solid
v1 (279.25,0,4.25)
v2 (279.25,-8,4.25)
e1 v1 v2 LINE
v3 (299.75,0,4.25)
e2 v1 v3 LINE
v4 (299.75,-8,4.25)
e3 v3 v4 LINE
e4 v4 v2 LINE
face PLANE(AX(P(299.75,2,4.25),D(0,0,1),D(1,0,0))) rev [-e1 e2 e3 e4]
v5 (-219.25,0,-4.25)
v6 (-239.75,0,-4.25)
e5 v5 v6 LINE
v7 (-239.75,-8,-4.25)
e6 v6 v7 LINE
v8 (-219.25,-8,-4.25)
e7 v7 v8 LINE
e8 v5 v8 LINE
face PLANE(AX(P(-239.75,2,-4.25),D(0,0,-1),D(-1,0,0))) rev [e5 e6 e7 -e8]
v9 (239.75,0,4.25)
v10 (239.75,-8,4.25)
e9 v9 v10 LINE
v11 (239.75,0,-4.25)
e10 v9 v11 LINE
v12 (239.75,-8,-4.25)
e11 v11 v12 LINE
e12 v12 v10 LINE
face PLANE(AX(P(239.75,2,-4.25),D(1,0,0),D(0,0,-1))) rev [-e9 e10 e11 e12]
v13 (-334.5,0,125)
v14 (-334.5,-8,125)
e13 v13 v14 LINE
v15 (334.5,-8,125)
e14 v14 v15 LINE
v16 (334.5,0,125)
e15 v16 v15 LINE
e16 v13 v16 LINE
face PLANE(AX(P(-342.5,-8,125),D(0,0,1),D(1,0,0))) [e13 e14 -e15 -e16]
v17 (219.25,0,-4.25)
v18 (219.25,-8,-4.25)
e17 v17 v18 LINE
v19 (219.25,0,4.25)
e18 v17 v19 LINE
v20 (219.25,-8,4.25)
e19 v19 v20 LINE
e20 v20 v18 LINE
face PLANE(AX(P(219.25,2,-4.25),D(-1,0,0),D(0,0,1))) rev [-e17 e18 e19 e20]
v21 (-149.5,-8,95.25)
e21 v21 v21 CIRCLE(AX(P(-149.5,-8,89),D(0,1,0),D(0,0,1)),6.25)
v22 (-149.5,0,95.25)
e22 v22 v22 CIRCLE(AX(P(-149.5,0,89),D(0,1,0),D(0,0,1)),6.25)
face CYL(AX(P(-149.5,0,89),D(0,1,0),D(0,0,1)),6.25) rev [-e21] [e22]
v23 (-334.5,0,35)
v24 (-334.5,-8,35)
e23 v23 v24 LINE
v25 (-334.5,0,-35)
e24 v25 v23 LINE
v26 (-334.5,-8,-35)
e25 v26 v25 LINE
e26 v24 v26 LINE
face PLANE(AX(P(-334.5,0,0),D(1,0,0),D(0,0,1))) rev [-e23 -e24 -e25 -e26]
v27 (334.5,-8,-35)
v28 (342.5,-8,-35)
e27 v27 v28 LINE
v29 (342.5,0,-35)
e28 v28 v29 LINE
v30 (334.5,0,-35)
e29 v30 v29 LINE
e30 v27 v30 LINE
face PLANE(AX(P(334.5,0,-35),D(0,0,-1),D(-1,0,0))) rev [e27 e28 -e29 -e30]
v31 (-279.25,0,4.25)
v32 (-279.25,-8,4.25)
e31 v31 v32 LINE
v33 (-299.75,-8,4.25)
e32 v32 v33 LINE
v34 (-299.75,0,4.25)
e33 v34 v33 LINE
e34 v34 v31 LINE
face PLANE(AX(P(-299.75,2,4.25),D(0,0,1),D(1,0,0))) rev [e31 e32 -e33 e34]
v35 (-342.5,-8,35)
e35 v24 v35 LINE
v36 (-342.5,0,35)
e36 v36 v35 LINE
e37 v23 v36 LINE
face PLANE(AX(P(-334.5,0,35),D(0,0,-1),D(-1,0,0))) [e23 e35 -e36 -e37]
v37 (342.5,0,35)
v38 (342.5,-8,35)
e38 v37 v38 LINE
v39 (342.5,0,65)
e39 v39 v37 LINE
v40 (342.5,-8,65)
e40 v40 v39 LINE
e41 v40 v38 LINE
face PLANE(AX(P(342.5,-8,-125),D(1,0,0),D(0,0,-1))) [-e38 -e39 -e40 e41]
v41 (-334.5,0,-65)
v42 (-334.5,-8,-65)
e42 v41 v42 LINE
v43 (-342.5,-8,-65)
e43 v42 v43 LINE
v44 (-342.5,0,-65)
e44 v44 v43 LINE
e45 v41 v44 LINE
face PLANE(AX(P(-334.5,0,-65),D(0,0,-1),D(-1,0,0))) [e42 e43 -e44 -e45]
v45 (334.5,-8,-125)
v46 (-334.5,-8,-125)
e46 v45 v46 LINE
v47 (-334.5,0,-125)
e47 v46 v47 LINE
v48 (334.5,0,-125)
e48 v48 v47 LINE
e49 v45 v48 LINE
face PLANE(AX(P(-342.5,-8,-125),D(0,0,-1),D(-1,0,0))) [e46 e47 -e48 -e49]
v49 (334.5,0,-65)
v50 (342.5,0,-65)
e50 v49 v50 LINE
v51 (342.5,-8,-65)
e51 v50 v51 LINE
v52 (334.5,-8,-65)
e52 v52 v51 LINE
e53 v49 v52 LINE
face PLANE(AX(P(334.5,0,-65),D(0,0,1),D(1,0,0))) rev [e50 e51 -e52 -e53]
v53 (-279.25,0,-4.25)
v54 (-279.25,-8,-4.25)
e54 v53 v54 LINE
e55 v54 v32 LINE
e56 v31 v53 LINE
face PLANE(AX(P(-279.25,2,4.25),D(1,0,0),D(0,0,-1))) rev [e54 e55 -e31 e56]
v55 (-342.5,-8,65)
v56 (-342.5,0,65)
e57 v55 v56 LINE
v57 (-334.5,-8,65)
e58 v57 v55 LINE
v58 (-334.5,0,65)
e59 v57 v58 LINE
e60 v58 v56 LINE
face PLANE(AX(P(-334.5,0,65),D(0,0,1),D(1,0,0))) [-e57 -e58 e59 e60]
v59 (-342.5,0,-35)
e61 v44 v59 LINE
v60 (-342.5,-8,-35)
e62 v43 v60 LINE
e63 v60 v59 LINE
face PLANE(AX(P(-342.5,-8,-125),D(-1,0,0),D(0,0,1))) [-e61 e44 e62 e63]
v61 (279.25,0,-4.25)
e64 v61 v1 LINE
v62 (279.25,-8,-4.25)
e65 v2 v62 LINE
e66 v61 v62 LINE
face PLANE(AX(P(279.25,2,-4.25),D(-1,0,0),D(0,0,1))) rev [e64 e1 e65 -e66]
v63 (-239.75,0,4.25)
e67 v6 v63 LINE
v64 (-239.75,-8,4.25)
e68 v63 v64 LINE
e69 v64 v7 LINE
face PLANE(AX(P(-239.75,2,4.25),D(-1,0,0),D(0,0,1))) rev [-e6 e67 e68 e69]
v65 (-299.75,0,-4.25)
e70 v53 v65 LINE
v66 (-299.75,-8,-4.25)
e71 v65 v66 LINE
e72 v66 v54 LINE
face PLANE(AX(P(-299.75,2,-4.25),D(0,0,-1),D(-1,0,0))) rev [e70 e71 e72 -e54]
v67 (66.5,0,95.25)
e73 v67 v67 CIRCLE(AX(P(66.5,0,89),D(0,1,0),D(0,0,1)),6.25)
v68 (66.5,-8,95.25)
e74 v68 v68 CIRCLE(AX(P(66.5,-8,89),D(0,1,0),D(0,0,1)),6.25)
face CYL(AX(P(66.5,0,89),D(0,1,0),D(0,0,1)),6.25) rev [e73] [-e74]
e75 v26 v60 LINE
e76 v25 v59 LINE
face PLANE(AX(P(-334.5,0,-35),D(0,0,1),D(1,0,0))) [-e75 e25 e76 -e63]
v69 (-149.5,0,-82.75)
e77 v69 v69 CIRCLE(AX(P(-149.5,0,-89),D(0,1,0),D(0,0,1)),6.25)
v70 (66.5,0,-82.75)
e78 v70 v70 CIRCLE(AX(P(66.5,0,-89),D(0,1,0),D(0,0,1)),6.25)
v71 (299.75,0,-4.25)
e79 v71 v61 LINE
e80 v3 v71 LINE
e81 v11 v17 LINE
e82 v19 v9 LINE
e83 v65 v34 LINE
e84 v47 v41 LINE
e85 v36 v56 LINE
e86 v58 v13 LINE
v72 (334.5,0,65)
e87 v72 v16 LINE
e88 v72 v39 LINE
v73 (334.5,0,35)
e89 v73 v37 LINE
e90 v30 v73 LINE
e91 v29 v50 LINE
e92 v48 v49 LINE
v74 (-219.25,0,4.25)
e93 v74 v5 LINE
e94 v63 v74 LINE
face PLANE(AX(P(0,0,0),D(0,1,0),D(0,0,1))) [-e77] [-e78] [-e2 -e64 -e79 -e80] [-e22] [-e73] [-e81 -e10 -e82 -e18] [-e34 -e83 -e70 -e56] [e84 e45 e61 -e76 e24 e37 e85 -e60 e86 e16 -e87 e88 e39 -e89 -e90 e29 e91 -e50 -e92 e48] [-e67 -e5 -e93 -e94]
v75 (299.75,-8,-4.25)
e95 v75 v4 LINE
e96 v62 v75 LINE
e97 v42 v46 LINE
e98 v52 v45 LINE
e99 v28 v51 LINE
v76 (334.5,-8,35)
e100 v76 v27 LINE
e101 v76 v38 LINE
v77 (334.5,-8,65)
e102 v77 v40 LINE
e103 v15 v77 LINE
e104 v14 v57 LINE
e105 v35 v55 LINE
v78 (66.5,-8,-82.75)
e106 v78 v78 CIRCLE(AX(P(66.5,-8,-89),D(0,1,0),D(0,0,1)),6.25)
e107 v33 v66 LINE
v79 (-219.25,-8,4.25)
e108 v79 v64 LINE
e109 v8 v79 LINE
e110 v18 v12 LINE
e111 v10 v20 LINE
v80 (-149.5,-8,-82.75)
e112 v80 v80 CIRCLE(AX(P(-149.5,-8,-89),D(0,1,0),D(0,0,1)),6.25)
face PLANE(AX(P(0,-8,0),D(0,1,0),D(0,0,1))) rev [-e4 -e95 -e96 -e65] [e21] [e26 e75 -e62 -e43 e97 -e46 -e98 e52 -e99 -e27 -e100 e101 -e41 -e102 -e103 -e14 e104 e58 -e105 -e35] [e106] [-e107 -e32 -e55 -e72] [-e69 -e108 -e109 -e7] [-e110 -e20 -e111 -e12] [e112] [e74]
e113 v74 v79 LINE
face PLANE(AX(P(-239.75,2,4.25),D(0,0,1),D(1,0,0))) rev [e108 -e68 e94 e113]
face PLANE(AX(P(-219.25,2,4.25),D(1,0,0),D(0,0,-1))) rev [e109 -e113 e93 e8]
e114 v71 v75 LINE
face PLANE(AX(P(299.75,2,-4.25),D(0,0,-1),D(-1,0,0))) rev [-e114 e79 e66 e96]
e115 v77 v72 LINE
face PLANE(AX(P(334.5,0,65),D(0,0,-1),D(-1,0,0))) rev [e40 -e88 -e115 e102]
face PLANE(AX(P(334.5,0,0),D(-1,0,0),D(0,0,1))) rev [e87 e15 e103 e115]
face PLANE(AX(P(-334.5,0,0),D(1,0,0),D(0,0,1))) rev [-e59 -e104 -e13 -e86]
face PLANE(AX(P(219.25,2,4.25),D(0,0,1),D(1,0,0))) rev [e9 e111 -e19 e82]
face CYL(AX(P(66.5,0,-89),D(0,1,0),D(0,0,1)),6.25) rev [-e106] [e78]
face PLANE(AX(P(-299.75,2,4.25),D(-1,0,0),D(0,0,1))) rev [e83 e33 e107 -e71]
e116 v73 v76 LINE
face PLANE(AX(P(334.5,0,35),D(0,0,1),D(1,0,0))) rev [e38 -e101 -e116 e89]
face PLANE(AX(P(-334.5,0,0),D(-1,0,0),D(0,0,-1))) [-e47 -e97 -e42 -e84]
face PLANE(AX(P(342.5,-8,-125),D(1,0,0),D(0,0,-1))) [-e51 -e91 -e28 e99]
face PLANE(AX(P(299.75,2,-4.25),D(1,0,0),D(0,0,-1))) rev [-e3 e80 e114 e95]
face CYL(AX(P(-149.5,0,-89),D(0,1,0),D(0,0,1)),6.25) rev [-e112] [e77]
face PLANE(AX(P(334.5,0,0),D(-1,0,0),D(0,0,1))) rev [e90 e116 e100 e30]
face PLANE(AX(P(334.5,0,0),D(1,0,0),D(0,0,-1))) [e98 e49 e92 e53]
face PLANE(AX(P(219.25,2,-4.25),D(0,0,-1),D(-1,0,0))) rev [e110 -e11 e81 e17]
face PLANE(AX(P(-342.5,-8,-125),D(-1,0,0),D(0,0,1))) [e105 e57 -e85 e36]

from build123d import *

# Parameters (mm, degrees)
SKETCH1_W                        = 685
SKETCH1_H                        = 250
BASE_FLANGE1_DEPTH               = 8
SKETCH6_W                        = 60
SKETCH6_H                        = 8
SKETCH6_W_2                      = 70
EXTRUDE1_DEPTH                   = 8
SKETCH7_W                        = 250
SKETCH7_H                        = 73.5
BASE_FLANGE2_DEPTH               = 8
SKETCH12_W                       = 30.5
SKETCH12_H                       = 8.5
EXTRUDE2_DEPTH                   = 699.681794525
SKETCH14_W                       = 250
SKETCH14_H                       = 8
BASE_FLANGE3_DEPTH               = 50.5
SKETCH19_W                       = 60
SKETCH19_H                       = 8
SKETCH19_W_2                     = 70
EXTRUDE3_DEPTH                   = 8
BREAK_CORNER1_START              = 41.5
BREAK_CORNER1_DEPTH              = 8
EXTRUDE4_DEPTH                   = 8
BASE_FLANGE4_DEPTH               = 8
SKETCH38_W                       = 8.5
SKETCH38_H                       = 20.5
EXTRUDE5_DEPTH                   = 10
SKETCH39_W                       = 20.5
SKETCH39_H                       = 8.5
EXTRUDE6_DEPTH                   = 10
F_12_5_12_5_DIAMETER_HOLE1_D     = 12.5
F_12_5_12_5_DIAMETER_HOLE1_DEPTH = 10
F_12_5_12_5_DIAMETER_HOLE1_TIP   = 3.755378869


# Read off the part's stored shape, not the designer's step: Break-Corner1
# Sheet-metal steps are written as plain solids
with BuildPart() as part:
    # Sketch1 → Base-Flange1 (new body)
    with BuildSketch(Plane(origin=(0, 0, 0), x_dir=(1, 0, 0), z_dir=(0, 1, 0))):
        Rectangle(SKETCH1_W, SKETCH1_H)
    extrude(amount=-BASE_FLANGE1_DEPTH)

    # Sketch6 → Extrude1 (cut)
    with BuildSketch(Plane(origin=(342.5, 0, 0), x_dir=(0, 0, -1), z_dir=(1, 0, 0))):
        with Locations((-95, -4)):
            Rectangle(SKETCH6_W, SKETCH6_H)
        with Locations((95, -4)):
            Rectangle(SKETCH6_W, SKETCH6_H)
        with Locations((0, -4)):
            Rectangle(SKETCH6_W_2, SKETCH6_H)
    extrude1 = extrude(amount=-EXTRUDE1_DEPTH, mode=Mode.SUBTRACT)

    # Mirror1: Extrude1 across plane
    add(extrude1.mirror(Plane(origin=(0, 0, 0), x_dir=(0, 0, 1), z_dir=(1, 0, 0))), mode=Mode.SUBTRACT)

    # Sketch39 → Extrude6 (cut)
    with BuildSketch(Plane.XZ.offset(8)):
        with Locations((289.5, 0)):
            Rectangle(SKETCH39_W, SKETCH39_H)
        with Locations((229.5, 0)):
            Rectangle(SKETCH39_W, SKETCH39_H)
        with Locations((-289.5, 0)):
            Rectangle(SKETCH39_W, SKETCH39_H)
        with Locations((-229.5, 0)):
            Rectangle(SKETCH39_W, SKETCH39_H)
    extrude(amount=-EXTRUDE6_DEPTH, mode=Mode.SUBTRACT)

    # Ø12.5 (12.5) Diameter Hole1
    with Locations(Plane(origin=(131.975, 0, 2029.150100001), x_dir=(1, 0, 0), z_dir=(0, 1, 0))):
        with Locations((-281.475, 2118.150100001), (-281.475, 1940.150100001), (-65.475, 1940.150100001), (-65.475, 2118.150100001)):
            Hole(F_12_5_12_5_DIAMETER_HOLE1_D / 2, depth=F_12_5_12_5_DIAMETER_HOLE1_DEPTH)
            with Locations((0, 0, -(F_12_5_12_5_DIAMETER_HOLE1_DEPTH + F_12_5_12_5_DIAMETER_HOLE1_TIP / 2))):  # 118° drill point
                Cone(0, F_12_5_12_5_DIAMETER_HOLE1_D / 2, F_12_5_12_5_DIAMETER_HOLE1_TIP, mode=Mode.SUBTRACT)


with BuildPart() as body_2:
    # Sketch7 → Base-Flange2 (new body)
    with BuildSketch(Plane(origin=(334.5, 0, 0), x_dir=(0, 0, -1), z_dir=(1, 0, 0))):
        with Locations((0, 20.75)):
            Rectangle(SKETCH7_W, SKETCH7_H)
    extrude(amount=BASE_FLANGE2_DEPTH)

    # Sketch12 → Extrude2 (cut, through all)
    with BuildSketch(Plane(origin=(342.5, 0, 0), x_dir=(0, 0, -1), z_dir=(1, 0, 0))):
        with Locations((-50, -4)):
            Rectangle(SKETCH12_W, SKETCH12_H)
        with Locations((50, -4)):
            Rectangle(SKETCH12_W, SKETCH12_H)
        with Locations((50, 45.5)):
            Rectangle(SKETCH12_W, SKETCH12_H)
        with Locations((-50, 45.5)):
            Rectangle(SKETCH12_W, SKETCH12_H)
    extrude(amount=-EXTRUDE2_DEPTH, mode=Mode.SUBTRACT)

    # Sketch38 → Extrude5 (cut)
    with BuildSketch(Plane(origin=(342.5, 0, 0), x_dir=(0, 0, -1), z_dir=(1, 0, 0))):
        with Locations((0, 27.5)):
            Rectangle(SKETCH38_W, SKETCH38_H)
    extrude(amount=-EXTRUDE5_DEPTH, mode=Mode.SUBTRACT)


with BuildPart() as body_3:
    # Sketch14 → Base-Flange3 (new body)
    with BuildSketch(Plane.ZY.offset(-334.5)):
        with Locations((0, 45.5)):
            Rectangle(SKETCH14_W, SKETCH14_H)
    extrude(amount=-BASE_FLANGE3_DEPTH)

    # Sketch19 → Extrude3 (cut)
    with BuildSketch(Plane(origin=(342.5, 0, 0), x_dir=(0, 0, -1), z_dir=(1, 0, 0))):
        with Locations((95, 45.5)):
            Rectangle(SKETCH19_W, SKETCH19_H)
        with Locations((0, 45.5)):
            Rectangle(SKETCH19_W_2, SKETCH19_H)
        with Locations((-95, 45.5)):
            Rectangle(SKETCH19_W, SKETCH19_H)
    extrude(amount=-EXTRUDE3_DEPTH, mode=Mode.SUBTRACT)

    # Break-Corner1 outline → Break-Corner1 (cut)
    with BuildSketch(Plane(origin=(0, 0, 0), x_dir=(1, 0, 0), z_dir=(0, 1, 0)).offset(BREAK_CORNER1_START)):
        Polygon((385, -125), (385, -110), (370, -125), align=None)
        Polygon((370, 125), (385, 110), (385, 125), align=None)
    extrude(amount=BREAK_CORNER1_DEPTH, mode=Mode.SUBTRACT)

    # Sketch20 → Extrude4 (cut)
    with BuildSketch(Plane(origin=(0, 49.5, 0), x_dir=(1, 0, 0), z_dir=(0, 1, 0))):
        with BuildLine():
            Line((367, 75), (367, 55))
            ThreePointArc((367, 55), (362.5, 50.5), (358, 55))
            Line((358, 55), (358, 75))
            ThreePointArc((358, 75), (362.5, 79.5), (367, 75))
        make_face()
        with BuildLine():
            Line((367, -75), (367, -55))
            ThreePointArc((367, -55), (362.5, -50.5), (358, -55))
            Line((358, -55), (358, -75))
            ThreePointArc((358, -75), (362.5, -79.5), (367, -75))
        make_face()
    extrude(amount=-EXTRUDE4_DEPTH, mode=Mode.SUBTRACT)


with BuildPart() as body_4:
    # Mirror4: mirrored copy
    add(body_3.part.mirror(Plane(origin=(0, 0, 0), x_dir=(0, 0, 1), z_dir=(1, 0, 0))))


with BuildPart() as body_5:
    # Sketch29 → Base-Flange4 (new body)
    with BuildSketch(Plane.XY.offset(4)):
        Polygon((219.5, 0), (219.5, -8), (239.5, -8), (239.5, 0), (279.5, 0), (279.5, -8), (299.5, -8), (299.5, 0), (334.5, 0), (334.5, 17.5), (342.5, 17.5), (342.5, 37.5), (334.5, 37.5), (334.5, 57.5), (194.5, 10), (194.5, 0), align=None)
    extrude(amount=-BASE_FLANGE4_DEPTH)


with BuildPart() as body_6:
    # Mirror5: mirrored copy
    add(body_5.part.mirror(Plane(origin=(0, 0, 0), x_dir=(0, 0, 1), z_dir=(1, 0, 0))))


with BuildPart() as body_7:
    # Mirror3: mirrored copy
    add(body_2.part.mirror(Plane(origin=(0, 0, 0), x_dir=(0, 0, 1), z_dir=(1, 0, 0))))


solid = part.part
